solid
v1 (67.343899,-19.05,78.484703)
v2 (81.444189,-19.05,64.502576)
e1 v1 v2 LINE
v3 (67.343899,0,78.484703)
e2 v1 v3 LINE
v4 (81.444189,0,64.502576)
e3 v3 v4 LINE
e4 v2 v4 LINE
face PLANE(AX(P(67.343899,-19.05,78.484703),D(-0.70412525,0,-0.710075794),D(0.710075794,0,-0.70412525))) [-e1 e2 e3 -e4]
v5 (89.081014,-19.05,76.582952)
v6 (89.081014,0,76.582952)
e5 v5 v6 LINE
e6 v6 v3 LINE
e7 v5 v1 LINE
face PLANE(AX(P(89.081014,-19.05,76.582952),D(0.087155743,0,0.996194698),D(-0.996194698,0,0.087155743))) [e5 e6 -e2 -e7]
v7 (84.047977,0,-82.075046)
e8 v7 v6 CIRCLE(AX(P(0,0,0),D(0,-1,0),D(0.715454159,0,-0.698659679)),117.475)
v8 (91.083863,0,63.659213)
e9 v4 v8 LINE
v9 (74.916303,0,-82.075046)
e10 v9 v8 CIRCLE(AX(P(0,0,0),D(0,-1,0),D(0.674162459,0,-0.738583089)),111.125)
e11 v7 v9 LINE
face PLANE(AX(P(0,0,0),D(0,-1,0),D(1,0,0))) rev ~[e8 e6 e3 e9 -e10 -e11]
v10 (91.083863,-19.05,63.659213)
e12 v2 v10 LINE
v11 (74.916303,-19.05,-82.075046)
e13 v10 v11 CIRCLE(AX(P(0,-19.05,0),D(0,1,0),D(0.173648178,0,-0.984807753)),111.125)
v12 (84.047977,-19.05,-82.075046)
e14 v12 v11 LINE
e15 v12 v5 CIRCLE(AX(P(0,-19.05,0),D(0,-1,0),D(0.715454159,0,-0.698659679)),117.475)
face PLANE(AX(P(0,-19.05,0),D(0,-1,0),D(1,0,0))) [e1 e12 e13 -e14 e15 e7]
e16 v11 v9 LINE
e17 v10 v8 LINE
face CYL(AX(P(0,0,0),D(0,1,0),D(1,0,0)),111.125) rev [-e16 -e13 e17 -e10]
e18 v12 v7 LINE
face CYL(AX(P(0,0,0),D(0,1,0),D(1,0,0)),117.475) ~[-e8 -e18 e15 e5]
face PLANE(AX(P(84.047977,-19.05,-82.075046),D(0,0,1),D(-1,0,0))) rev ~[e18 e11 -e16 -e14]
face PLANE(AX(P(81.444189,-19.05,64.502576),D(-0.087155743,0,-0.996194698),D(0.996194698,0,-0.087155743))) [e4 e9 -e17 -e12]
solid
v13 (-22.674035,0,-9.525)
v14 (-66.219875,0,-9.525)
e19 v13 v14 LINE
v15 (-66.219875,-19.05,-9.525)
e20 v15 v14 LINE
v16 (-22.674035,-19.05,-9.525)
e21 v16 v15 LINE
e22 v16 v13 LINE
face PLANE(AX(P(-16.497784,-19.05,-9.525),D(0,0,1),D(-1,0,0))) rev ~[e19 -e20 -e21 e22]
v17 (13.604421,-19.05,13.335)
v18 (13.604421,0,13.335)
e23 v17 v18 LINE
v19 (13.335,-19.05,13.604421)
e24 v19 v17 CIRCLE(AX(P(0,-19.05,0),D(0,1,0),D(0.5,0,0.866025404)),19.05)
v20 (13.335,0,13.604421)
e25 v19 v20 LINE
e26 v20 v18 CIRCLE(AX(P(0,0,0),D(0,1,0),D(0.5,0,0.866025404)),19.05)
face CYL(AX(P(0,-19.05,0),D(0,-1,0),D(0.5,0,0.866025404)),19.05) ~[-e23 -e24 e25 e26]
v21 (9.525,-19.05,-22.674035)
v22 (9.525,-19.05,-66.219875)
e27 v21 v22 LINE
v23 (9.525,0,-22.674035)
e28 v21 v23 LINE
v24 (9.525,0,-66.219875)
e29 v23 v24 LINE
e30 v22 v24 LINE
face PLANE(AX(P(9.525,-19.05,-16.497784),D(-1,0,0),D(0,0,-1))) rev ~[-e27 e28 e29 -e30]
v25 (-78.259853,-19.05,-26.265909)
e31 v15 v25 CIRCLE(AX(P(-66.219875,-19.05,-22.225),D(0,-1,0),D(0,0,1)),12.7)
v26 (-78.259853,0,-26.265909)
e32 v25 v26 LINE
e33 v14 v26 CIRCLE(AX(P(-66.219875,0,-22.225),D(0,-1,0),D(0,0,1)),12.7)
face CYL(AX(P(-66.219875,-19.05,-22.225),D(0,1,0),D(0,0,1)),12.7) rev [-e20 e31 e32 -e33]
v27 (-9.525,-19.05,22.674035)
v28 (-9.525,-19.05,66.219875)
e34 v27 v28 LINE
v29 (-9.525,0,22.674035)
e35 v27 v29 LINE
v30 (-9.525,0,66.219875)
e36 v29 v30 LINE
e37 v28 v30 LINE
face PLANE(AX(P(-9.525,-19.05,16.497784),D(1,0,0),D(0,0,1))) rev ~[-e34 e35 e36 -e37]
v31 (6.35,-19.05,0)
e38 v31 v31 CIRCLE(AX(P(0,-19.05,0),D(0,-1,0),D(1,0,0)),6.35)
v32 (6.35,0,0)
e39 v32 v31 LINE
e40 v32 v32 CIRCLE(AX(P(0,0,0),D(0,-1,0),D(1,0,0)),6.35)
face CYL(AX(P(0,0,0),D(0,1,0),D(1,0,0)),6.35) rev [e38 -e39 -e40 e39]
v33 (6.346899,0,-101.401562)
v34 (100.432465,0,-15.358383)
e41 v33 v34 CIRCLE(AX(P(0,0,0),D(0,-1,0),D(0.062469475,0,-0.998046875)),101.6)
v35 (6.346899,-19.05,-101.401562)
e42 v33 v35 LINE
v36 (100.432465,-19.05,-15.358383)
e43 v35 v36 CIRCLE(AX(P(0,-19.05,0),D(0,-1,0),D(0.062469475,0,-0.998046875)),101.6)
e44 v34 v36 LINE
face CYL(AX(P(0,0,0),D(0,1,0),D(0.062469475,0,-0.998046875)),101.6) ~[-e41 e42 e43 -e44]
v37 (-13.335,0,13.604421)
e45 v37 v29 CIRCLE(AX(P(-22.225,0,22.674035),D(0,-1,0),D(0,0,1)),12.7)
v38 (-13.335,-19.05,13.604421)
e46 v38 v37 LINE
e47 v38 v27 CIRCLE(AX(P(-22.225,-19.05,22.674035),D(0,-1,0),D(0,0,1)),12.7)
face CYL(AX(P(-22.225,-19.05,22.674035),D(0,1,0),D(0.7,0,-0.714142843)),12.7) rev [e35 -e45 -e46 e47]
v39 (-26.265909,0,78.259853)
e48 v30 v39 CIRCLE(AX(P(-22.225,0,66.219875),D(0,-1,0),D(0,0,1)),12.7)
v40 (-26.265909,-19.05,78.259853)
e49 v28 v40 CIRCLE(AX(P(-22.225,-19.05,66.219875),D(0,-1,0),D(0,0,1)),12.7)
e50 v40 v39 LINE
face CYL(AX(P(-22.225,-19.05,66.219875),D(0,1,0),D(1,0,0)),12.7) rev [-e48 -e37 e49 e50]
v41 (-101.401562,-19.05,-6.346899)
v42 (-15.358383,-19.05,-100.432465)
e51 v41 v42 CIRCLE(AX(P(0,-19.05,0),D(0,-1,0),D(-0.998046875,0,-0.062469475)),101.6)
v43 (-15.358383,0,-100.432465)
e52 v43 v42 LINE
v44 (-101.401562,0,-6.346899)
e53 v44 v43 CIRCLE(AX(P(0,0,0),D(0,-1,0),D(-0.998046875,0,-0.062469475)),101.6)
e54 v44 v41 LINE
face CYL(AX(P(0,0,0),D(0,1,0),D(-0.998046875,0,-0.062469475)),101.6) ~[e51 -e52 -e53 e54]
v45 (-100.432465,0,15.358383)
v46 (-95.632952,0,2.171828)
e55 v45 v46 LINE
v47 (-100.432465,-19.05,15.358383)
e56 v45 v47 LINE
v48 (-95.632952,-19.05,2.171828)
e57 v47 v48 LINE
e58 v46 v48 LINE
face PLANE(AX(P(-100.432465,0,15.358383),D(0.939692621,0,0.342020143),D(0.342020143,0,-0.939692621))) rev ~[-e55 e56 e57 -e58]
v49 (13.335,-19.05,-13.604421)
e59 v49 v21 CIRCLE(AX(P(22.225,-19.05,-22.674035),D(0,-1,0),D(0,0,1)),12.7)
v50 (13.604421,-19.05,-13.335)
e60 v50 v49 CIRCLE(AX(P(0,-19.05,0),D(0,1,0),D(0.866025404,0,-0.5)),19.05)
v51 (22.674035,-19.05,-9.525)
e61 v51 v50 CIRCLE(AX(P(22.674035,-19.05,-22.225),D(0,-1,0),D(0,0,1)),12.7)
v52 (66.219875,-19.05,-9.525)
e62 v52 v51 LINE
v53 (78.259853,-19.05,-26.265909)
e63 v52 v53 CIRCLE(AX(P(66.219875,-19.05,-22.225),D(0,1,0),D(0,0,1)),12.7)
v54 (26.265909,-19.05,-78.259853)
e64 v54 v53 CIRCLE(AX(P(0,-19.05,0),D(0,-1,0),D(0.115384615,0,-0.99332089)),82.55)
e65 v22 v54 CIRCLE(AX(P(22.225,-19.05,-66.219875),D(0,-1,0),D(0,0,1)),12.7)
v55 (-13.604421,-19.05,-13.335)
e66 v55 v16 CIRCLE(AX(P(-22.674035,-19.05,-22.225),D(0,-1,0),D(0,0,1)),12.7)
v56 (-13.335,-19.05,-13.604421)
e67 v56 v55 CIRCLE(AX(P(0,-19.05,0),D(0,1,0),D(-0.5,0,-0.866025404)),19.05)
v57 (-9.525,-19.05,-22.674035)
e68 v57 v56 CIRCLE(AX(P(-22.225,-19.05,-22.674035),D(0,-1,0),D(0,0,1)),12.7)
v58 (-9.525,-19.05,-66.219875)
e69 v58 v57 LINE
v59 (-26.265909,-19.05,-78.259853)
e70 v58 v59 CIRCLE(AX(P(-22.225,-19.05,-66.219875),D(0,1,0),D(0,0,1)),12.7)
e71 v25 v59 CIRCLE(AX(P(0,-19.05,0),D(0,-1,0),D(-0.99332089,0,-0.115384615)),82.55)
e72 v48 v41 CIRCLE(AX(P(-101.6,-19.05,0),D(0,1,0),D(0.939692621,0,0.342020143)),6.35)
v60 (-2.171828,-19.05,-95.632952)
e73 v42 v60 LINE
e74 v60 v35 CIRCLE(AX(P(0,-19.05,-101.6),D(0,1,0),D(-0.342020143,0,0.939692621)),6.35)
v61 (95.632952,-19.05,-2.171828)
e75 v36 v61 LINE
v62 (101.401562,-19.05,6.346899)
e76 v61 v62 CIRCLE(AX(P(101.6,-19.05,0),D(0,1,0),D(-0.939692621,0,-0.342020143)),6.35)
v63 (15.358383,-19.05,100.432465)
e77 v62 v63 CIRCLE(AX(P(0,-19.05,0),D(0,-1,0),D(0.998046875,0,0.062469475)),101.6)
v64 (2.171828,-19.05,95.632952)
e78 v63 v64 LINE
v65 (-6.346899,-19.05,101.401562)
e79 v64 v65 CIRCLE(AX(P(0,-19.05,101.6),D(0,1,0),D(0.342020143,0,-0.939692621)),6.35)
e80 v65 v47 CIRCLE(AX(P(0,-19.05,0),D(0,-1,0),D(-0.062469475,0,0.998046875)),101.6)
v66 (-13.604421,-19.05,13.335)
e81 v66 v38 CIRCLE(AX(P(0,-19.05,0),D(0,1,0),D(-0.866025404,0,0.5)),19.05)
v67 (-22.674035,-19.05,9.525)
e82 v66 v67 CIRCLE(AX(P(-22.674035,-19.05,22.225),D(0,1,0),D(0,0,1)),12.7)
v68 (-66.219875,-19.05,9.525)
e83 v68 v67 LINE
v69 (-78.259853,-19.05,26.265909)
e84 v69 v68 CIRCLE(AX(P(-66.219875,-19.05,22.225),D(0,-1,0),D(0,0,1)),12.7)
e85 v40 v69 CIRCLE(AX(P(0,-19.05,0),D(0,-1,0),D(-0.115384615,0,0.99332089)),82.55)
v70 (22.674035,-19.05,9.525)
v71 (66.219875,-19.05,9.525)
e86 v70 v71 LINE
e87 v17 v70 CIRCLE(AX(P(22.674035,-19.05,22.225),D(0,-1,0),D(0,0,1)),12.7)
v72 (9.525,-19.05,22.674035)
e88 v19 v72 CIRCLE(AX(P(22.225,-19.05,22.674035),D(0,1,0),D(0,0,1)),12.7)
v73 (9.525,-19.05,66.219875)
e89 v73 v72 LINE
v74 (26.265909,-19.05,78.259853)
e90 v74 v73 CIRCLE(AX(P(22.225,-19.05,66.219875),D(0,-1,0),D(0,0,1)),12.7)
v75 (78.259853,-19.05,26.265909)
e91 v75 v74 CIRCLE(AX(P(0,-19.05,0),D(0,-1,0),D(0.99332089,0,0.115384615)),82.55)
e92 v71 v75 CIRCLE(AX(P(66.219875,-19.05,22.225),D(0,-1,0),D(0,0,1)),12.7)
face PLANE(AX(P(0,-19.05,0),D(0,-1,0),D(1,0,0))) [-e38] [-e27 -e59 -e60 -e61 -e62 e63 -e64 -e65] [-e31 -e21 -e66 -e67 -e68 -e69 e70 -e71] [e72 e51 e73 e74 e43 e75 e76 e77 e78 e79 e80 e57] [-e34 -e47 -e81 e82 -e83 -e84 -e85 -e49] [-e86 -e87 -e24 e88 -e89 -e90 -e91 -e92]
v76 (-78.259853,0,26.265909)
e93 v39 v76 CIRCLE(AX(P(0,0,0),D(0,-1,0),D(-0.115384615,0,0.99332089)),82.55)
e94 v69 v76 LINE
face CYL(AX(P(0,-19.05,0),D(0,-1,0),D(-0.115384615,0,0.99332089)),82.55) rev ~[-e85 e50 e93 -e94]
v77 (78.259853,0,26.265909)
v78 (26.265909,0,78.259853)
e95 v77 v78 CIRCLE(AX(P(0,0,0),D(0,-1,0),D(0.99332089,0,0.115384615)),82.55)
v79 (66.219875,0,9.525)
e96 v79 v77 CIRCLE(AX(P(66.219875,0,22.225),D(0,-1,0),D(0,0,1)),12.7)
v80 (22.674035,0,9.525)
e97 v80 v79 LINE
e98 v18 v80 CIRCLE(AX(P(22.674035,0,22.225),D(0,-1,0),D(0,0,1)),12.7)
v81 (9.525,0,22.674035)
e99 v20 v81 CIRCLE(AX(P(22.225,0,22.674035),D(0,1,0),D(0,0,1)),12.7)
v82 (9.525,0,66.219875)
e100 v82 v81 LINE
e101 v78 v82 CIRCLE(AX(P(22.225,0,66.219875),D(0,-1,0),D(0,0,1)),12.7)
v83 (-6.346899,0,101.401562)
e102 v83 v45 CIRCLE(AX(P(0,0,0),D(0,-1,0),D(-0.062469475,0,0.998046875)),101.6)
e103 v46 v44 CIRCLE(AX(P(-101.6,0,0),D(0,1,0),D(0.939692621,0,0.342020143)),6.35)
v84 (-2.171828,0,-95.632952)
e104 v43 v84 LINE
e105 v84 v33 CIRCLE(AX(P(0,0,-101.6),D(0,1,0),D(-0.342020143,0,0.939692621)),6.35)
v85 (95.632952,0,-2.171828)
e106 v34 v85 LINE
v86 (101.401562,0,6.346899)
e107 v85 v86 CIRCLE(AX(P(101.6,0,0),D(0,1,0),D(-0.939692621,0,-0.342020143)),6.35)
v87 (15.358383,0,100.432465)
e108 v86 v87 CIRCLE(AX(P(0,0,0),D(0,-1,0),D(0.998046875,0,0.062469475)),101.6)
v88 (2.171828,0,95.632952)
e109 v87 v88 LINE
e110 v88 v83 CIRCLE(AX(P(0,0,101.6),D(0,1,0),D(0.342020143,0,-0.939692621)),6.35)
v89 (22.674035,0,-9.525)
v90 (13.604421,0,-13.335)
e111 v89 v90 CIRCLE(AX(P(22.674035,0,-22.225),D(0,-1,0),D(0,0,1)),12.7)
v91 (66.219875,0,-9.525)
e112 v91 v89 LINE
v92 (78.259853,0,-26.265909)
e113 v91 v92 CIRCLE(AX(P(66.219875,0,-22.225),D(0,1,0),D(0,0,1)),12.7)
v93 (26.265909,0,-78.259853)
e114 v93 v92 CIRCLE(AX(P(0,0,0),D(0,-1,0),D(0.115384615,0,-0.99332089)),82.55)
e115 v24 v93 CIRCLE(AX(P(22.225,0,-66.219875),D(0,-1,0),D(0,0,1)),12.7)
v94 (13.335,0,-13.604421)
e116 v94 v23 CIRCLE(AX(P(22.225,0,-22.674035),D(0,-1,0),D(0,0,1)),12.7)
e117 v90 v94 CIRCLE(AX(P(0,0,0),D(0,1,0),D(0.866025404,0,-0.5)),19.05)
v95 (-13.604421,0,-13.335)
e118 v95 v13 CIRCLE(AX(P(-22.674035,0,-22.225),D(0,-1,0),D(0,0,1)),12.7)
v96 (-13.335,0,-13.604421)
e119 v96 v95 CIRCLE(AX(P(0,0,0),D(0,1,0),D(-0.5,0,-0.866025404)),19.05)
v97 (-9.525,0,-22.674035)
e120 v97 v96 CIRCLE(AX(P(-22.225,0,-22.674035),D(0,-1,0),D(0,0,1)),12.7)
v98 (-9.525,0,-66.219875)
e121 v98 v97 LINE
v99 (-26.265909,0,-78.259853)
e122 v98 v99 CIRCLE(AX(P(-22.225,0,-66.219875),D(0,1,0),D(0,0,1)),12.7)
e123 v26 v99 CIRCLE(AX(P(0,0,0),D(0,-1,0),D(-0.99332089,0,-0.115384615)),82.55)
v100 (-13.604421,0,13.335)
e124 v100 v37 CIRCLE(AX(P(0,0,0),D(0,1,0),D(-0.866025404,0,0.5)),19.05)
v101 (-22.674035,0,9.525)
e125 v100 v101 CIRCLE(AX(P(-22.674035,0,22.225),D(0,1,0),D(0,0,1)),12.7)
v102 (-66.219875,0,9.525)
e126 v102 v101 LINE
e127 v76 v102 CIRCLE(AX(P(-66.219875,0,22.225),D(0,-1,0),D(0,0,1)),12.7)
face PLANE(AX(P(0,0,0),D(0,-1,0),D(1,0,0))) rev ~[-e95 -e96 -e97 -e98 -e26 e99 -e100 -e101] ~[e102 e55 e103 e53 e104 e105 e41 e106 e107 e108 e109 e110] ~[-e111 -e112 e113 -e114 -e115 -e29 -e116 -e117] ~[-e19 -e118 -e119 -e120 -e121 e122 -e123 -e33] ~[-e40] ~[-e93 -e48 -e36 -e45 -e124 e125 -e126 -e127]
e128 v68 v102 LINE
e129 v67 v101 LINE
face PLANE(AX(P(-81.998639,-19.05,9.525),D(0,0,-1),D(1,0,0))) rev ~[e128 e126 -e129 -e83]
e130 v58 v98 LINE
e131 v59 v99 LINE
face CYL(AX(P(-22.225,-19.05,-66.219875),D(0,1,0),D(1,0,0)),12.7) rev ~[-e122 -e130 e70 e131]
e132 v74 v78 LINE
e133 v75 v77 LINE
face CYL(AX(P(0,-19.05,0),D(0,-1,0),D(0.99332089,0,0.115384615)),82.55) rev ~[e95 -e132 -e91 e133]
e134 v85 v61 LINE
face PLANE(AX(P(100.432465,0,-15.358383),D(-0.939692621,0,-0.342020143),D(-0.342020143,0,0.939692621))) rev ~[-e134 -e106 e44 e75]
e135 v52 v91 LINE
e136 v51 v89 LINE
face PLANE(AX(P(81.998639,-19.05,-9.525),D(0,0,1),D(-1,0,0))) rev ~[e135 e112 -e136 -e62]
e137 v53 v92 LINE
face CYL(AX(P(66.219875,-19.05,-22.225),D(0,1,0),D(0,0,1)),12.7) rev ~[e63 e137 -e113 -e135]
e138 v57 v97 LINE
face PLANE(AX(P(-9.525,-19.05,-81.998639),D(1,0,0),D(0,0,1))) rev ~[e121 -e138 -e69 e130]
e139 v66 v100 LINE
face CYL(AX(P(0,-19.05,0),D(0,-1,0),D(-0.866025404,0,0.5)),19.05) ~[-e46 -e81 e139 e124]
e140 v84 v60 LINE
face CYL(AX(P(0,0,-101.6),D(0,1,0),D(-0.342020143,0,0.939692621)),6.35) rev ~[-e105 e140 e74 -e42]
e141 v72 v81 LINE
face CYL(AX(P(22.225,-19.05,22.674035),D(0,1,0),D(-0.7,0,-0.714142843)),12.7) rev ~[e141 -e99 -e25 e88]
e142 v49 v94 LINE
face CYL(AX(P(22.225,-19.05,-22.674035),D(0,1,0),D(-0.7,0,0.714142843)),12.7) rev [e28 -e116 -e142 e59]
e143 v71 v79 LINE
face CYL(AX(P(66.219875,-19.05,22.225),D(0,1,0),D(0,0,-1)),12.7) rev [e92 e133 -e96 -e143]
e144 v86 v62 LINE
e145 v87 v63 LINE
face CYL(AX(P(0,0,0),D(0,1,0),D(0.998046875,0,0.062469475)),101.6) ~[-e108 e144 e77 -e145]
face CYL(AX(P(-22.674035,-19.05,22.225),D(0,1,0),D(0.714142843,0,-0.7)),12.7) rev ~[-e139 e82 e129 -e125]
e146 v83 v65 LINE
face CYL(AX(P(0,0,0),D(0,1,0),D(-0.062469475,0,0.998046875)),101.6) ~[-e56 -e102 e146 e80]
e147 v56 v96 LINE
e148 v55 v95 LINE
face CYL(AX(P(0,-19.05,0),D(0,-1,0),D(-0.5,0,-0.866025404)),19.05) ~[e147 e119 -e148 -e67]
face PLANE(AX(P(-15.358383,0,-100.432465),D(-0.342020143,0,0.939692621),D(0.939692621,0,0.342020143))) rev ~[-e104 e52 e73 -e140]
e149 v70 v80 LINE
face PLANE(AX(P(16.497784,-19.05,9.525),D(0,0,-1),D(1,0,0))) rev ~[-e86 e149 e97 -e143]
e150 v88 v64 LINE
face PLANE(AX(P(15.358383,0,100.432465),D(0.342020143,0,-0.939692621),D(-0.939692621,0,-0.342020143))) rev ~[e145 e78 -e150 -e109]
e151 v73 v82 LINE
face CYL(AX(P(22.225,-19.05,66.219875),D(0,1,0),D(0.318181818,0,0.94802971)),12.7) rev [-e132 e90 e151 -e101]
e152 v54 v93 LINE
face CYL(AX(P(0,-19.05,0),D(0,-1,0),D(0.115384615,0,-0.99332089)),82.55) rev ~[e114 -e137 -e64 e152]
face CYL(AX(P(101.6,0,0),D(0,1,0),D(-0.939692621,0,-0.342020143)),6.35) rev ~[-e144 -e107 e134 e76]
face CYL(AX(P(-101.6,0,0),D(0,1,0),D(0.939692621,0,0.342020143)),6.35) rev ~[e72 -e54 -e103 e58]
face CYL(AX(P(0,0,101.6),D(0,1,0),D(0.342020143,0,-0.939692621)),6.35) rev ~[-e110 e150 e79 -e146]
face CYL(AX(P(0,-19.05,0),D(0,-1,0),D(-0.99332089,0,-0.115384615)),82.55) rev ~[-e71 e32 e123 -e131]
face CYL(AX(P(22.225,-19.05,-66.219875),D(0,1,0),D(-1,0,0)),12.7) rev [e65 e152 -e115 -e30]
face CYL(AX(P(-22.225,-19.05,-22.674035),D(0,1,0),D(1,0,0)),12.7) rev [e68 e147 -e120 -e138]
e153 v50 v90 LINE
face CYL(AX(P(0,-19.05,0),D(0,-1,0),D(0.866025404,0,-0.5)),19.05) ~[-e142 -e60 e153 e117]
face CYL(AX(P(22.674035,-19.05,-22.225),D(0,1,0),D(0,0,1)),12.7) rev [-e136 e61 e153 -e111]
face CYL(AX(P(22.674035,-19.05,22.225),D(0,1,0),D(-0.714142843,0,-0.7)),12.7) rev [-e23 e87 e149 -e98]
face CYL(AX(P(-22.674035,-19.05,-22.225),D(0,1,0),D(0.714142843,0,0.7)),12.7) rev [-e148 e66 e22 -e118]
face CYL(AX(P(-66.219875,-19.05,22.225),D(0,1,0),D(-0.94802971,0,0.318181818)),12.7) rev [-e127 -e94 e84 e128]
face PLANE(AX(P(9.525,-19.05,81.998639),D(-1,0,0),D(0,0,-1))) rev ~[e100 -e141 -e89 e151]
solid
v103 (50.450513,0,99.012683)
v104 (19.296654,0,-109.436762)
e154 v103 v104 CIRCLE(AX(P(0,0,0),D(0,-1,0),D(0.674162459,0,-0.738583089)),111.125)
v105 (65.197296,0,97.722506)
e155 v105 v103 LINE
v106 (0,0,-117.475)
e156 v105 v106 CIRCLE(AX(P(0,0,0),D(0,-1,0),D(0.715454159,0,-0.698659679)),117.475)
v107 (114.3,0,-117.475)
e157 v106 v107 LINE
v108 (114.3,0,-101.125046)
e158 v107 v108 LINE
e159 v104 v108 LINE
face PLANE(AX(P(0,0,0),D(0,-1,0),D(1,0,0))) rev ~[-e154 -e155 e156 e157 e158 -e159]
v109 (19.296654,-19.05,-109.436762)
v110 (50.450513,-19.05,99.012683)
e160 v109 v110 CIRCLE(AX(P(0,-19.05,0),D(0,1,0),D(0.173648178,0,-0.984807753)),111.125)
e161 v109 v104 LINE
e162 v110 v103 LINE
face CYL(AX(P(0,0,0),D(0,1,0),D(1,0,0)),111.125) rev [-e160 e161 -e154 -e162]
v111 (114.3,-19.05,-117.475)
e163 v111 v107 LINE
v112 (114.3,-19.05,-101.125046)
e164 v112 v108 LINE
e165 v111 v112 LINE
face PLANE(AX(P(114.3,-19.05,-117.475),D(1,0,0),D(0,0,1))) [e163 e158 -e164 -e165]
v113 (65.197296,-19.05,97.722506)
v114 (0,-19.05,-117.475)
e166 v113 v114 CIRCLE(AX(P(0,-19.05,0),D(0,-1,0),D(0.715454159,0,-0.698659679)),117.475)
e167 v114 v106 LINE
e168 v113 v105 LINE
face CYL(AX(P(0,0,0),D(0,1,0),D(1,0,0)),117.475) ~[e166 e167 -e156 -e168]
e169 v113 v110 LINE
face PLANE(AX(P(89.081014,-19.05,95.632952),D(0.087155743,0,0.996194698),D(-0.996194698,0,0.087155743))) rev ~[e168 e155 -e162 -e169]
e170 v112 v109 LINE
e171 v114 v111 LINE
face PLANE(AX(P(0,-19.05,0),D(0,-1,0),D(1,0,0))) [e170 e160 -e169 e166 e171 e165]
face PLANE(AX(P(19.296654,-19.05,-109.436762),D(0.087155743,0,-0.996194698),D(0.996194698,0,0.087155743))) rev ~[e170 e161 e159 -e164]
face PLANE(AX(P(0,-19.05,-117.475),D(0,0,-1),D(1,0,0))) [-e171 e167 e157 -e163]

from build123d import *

# Parameters (mm, degrees)
F0_R      = 6.35
F1_DEPTH  = 19.05
F3_DEPTH  = 19.05
F4_R      = 12.7
F5_R      = 117.475
F5_R_2    = 111.125
F6_DEPTH  = 19.05
F8_DEPTH  = 19.05
F9_DEPTH  = 19.05
F11_DEPTH = 19.05
F12_DEPTH = 25.4


with BuildPart() as f1:
    # F0 (on Front) → F1 (new body)
    with BuildSketch(Plane.XZ):
        with BuildLine():
            ThreePointArc((2.1718279101, 95.632951858), (-3.5604804619, 96.3421031885), (-6.3468986567, 101.4015625))
            ThreePointArc((-6.3468986567, 101.4015625), (-68.5661384352, 74.9749602207), (-100.4324652793, 15.3583826596))
            Line((-100.4324652793, 15.3583826596), (-95.632951858, 2.1718279101))
            ThreePointArc((-95.632951858, 2.1718279101), (-96.3421031885, -3.5604804619), (-101.4015625, -6.3468986567))
            ThreePointArc((-101.4015625, -6.3468986567), (-74.9749602207, -68.5661384352), (-15.3583826596, -100.4324652793))
            Line((-15.3583826596, -100.4324652793), (-2.1718279101, -95.632951858))
            ThreePointArc((-2.1718279101, -95.632951858), (3.5604804619, -96.3421031885), (6.3468986567, -101.4015625))
            ThreePointArc((6.3468986567, -101.4015625), (68.5661384352, -74.9749602207), (100.4324652793, -15.3583826596))
            Line((100.4324652793, -15.3583826596), (95.632951858, -2.1718279101))
            ThreePointArc((95.632951858, -2.1718279101), (96.3421031885, 3.5604804619), (101.4015625, 6.3468986567))
            ThreePointArc((101.4015625, 6.3468986567), (74.9749602207, 68.5661384352), (15.3583826596, 100.4324652793))
            Line((15.3583826596, 100.4324652793), (2.1718279101, 95.632951858))
        make_face()
        Circle(F0_R, mode=Mode.SUBTRACT)
    extrude(amount=F1_DEPTH)

    # F2 (on face) → F3 (cut)
    with BuildSketch(Plane.XZ.offset(19.05)):
        with BuildLine():
            ThreePointArc((9.525, 16.4977839421), (13.4703841816, 13.4703841816), (16.4977839421, 9.525))
            Line((16.4977839421, 9.525), (81.9986394704, 9.525))
            ThreePointArc((81.9986394704, 9.525), (58.3716647869, 58.3716647869), (9.525, 81.9986394704))
            Line((9.525, 81.9986394704), (9.525, 16.4977839421))
        make_face()
        with BuildLine():
            ThreePointArc((-16.4977839421, 9.525), (-13.4703841816, 13.4703841816), (-9.525, 16.4977839421))
            Line((-9.525, 16.4977839421), (-9.525, 81.9986394704))
            ThreePointArc((-9.525, 81.9986394704), (-58.3716647869, 58.3716647869), (-81.9986394704, 9.525))
            Line((-81.9986394704, 9.525), (-16.4977839421, 9.525))
        make_face()
        with BuildLine():
            Line((-9.525, -81.9986394704), (-9.525, -16.4977839421))
            ThreePointArc((-9.525, -16.4977839421), (-13.4703841816, -13.4703841816), (-16.4977839421, -9.525))
            Line((-16.4977839421, -9.525), (-81.9986394704, -9.525))
            ThreePointArc((-81.9986394704, -9.525), (-58.3716647869, -58.3716647869), (-9.525, -81.9986394704))
        make_face()
        with BuildLine():
            Line((81.9986394704, -9.525), (16.4977839421, -9.525))
            ThreePointArc((16.4977839421, -9.525), (13.4703841816, -13.4703841816), (9.525, -16.4977839421))
            Line((9.525, -16.4977839421), (9.525, -81.9986394704))
            ThreePointArc((9.525, -81.9986394704), (58.3716647869, -58.3716647869), (81.9986394704, -9.525))
        make_face()
    extrude(amount=-F3_DEPTH, mode=Mode.SUBTRACT)

    # F4
    f4_edges = [f1.edges().sort_by_distance(p)[0] for p in [
        (-9.525, -9.525, 81.998639),
        (-81.998639, -9.525, 9.525),
        (-9.525, -9.525, 16.497784),
        (-16.497784, -9.525, 9.525),
        (81.998639, -9.525, -9.525),
        (9.525, -9.525, 81.998639),
        (9.525, -9.525, 16.497784),
        (16.497784, -9.525, -9.525),
        (16.497784, -9.525, 9.525),
        (81.998639, -9.525, 9.525),
        (9.525, -9.525, -81.998639),
        (9.525, -9.525, -16.497784),
        (-9.525, -9.525, -16.497784),
        (-16.497784, -9.525, -9.525),
        (-81.998639, -9.525, -9.525),
        (-9.525, -9.525, -81.998639),
    ]]
    fillet(f4_edges, radius=F4_R)


with BuildPart() as f6:
    # F5 (on Front) → F6 (new body)
    with BuildSketch(Plane.XZ):
        Circle(F5_R)
        Circle(F5_R_2, mode=Mode.SUBTRACT)
    extrude(amount=F6_DEPTH)

    # F7 (on face) → F8 (join)
    with BuildSketch(Plane.XZ.offset(19.05)):
        with BuildLine():
            ThreePointArc((48.810471892, -106.8546370481), (24.9762601061, -114.7892070541), (0, -117.475))
            Line((0, -117.475), (114.3, -117.475))
            Line((114.3, -117.475), (114.3, -101.125045759))
            Line((114.3, -101.125045759), (48.810471892, -106.8546370481))
        make_face()
    extrude(amount=-F8_DEPTH)

    # F7 (on face) → F9 (cut)
    with BuildSketch(Plane.XZ.offset(19.05)):
        with BuildLine():
            ThreePointArc((74.9163032234, -82.075045759), (49.0528917385, -99.7124838578), (19.2966537432, -109.4367615535))
            Line((19.2966537432, -109.4367615535), (48.810471892, -106.8546370481))
            ThreePointArc((48.810471892, -106.8546370481), (67.5747653841, -96.0938432382), (84.0479773026, -82.075045759))
            Line((84.0479773026, -82.075045759), (74.9163032234, -82.075045759))
        make_face()
    extrude(amount=-F9_DEPTH, mode=Mode.SUBTRACT)

    # F10 (on face) → F11 (join)
    with BuildSketch(Plane.XZ.offset(19.05)):
        Polygon((89.0810143056, 76.582951858), (67.343899207, 78.4847030069), (81.4441892706, 64.5025755371), (91.0838634658, 63.6592133249), align=None)
    extrude(amount=-F11_DEPTH)

    # F10 (on face) → F12 (cut)
    with BuildSketch(Plane.XZ.offset(19.05)):
        Polygon((50.4505131202, 99.0126827781), (64.1809810406, 78.7614224901), (67.343899207, 78.4847030069), (89.0810143056, 76.582951858), (89.0810143056, 95.632951858), align=None)
    extrude(amount=-F12_DEPTH, mode=Mode.SUBTRACT)


solid = Compound([f1.part, f6.part])
